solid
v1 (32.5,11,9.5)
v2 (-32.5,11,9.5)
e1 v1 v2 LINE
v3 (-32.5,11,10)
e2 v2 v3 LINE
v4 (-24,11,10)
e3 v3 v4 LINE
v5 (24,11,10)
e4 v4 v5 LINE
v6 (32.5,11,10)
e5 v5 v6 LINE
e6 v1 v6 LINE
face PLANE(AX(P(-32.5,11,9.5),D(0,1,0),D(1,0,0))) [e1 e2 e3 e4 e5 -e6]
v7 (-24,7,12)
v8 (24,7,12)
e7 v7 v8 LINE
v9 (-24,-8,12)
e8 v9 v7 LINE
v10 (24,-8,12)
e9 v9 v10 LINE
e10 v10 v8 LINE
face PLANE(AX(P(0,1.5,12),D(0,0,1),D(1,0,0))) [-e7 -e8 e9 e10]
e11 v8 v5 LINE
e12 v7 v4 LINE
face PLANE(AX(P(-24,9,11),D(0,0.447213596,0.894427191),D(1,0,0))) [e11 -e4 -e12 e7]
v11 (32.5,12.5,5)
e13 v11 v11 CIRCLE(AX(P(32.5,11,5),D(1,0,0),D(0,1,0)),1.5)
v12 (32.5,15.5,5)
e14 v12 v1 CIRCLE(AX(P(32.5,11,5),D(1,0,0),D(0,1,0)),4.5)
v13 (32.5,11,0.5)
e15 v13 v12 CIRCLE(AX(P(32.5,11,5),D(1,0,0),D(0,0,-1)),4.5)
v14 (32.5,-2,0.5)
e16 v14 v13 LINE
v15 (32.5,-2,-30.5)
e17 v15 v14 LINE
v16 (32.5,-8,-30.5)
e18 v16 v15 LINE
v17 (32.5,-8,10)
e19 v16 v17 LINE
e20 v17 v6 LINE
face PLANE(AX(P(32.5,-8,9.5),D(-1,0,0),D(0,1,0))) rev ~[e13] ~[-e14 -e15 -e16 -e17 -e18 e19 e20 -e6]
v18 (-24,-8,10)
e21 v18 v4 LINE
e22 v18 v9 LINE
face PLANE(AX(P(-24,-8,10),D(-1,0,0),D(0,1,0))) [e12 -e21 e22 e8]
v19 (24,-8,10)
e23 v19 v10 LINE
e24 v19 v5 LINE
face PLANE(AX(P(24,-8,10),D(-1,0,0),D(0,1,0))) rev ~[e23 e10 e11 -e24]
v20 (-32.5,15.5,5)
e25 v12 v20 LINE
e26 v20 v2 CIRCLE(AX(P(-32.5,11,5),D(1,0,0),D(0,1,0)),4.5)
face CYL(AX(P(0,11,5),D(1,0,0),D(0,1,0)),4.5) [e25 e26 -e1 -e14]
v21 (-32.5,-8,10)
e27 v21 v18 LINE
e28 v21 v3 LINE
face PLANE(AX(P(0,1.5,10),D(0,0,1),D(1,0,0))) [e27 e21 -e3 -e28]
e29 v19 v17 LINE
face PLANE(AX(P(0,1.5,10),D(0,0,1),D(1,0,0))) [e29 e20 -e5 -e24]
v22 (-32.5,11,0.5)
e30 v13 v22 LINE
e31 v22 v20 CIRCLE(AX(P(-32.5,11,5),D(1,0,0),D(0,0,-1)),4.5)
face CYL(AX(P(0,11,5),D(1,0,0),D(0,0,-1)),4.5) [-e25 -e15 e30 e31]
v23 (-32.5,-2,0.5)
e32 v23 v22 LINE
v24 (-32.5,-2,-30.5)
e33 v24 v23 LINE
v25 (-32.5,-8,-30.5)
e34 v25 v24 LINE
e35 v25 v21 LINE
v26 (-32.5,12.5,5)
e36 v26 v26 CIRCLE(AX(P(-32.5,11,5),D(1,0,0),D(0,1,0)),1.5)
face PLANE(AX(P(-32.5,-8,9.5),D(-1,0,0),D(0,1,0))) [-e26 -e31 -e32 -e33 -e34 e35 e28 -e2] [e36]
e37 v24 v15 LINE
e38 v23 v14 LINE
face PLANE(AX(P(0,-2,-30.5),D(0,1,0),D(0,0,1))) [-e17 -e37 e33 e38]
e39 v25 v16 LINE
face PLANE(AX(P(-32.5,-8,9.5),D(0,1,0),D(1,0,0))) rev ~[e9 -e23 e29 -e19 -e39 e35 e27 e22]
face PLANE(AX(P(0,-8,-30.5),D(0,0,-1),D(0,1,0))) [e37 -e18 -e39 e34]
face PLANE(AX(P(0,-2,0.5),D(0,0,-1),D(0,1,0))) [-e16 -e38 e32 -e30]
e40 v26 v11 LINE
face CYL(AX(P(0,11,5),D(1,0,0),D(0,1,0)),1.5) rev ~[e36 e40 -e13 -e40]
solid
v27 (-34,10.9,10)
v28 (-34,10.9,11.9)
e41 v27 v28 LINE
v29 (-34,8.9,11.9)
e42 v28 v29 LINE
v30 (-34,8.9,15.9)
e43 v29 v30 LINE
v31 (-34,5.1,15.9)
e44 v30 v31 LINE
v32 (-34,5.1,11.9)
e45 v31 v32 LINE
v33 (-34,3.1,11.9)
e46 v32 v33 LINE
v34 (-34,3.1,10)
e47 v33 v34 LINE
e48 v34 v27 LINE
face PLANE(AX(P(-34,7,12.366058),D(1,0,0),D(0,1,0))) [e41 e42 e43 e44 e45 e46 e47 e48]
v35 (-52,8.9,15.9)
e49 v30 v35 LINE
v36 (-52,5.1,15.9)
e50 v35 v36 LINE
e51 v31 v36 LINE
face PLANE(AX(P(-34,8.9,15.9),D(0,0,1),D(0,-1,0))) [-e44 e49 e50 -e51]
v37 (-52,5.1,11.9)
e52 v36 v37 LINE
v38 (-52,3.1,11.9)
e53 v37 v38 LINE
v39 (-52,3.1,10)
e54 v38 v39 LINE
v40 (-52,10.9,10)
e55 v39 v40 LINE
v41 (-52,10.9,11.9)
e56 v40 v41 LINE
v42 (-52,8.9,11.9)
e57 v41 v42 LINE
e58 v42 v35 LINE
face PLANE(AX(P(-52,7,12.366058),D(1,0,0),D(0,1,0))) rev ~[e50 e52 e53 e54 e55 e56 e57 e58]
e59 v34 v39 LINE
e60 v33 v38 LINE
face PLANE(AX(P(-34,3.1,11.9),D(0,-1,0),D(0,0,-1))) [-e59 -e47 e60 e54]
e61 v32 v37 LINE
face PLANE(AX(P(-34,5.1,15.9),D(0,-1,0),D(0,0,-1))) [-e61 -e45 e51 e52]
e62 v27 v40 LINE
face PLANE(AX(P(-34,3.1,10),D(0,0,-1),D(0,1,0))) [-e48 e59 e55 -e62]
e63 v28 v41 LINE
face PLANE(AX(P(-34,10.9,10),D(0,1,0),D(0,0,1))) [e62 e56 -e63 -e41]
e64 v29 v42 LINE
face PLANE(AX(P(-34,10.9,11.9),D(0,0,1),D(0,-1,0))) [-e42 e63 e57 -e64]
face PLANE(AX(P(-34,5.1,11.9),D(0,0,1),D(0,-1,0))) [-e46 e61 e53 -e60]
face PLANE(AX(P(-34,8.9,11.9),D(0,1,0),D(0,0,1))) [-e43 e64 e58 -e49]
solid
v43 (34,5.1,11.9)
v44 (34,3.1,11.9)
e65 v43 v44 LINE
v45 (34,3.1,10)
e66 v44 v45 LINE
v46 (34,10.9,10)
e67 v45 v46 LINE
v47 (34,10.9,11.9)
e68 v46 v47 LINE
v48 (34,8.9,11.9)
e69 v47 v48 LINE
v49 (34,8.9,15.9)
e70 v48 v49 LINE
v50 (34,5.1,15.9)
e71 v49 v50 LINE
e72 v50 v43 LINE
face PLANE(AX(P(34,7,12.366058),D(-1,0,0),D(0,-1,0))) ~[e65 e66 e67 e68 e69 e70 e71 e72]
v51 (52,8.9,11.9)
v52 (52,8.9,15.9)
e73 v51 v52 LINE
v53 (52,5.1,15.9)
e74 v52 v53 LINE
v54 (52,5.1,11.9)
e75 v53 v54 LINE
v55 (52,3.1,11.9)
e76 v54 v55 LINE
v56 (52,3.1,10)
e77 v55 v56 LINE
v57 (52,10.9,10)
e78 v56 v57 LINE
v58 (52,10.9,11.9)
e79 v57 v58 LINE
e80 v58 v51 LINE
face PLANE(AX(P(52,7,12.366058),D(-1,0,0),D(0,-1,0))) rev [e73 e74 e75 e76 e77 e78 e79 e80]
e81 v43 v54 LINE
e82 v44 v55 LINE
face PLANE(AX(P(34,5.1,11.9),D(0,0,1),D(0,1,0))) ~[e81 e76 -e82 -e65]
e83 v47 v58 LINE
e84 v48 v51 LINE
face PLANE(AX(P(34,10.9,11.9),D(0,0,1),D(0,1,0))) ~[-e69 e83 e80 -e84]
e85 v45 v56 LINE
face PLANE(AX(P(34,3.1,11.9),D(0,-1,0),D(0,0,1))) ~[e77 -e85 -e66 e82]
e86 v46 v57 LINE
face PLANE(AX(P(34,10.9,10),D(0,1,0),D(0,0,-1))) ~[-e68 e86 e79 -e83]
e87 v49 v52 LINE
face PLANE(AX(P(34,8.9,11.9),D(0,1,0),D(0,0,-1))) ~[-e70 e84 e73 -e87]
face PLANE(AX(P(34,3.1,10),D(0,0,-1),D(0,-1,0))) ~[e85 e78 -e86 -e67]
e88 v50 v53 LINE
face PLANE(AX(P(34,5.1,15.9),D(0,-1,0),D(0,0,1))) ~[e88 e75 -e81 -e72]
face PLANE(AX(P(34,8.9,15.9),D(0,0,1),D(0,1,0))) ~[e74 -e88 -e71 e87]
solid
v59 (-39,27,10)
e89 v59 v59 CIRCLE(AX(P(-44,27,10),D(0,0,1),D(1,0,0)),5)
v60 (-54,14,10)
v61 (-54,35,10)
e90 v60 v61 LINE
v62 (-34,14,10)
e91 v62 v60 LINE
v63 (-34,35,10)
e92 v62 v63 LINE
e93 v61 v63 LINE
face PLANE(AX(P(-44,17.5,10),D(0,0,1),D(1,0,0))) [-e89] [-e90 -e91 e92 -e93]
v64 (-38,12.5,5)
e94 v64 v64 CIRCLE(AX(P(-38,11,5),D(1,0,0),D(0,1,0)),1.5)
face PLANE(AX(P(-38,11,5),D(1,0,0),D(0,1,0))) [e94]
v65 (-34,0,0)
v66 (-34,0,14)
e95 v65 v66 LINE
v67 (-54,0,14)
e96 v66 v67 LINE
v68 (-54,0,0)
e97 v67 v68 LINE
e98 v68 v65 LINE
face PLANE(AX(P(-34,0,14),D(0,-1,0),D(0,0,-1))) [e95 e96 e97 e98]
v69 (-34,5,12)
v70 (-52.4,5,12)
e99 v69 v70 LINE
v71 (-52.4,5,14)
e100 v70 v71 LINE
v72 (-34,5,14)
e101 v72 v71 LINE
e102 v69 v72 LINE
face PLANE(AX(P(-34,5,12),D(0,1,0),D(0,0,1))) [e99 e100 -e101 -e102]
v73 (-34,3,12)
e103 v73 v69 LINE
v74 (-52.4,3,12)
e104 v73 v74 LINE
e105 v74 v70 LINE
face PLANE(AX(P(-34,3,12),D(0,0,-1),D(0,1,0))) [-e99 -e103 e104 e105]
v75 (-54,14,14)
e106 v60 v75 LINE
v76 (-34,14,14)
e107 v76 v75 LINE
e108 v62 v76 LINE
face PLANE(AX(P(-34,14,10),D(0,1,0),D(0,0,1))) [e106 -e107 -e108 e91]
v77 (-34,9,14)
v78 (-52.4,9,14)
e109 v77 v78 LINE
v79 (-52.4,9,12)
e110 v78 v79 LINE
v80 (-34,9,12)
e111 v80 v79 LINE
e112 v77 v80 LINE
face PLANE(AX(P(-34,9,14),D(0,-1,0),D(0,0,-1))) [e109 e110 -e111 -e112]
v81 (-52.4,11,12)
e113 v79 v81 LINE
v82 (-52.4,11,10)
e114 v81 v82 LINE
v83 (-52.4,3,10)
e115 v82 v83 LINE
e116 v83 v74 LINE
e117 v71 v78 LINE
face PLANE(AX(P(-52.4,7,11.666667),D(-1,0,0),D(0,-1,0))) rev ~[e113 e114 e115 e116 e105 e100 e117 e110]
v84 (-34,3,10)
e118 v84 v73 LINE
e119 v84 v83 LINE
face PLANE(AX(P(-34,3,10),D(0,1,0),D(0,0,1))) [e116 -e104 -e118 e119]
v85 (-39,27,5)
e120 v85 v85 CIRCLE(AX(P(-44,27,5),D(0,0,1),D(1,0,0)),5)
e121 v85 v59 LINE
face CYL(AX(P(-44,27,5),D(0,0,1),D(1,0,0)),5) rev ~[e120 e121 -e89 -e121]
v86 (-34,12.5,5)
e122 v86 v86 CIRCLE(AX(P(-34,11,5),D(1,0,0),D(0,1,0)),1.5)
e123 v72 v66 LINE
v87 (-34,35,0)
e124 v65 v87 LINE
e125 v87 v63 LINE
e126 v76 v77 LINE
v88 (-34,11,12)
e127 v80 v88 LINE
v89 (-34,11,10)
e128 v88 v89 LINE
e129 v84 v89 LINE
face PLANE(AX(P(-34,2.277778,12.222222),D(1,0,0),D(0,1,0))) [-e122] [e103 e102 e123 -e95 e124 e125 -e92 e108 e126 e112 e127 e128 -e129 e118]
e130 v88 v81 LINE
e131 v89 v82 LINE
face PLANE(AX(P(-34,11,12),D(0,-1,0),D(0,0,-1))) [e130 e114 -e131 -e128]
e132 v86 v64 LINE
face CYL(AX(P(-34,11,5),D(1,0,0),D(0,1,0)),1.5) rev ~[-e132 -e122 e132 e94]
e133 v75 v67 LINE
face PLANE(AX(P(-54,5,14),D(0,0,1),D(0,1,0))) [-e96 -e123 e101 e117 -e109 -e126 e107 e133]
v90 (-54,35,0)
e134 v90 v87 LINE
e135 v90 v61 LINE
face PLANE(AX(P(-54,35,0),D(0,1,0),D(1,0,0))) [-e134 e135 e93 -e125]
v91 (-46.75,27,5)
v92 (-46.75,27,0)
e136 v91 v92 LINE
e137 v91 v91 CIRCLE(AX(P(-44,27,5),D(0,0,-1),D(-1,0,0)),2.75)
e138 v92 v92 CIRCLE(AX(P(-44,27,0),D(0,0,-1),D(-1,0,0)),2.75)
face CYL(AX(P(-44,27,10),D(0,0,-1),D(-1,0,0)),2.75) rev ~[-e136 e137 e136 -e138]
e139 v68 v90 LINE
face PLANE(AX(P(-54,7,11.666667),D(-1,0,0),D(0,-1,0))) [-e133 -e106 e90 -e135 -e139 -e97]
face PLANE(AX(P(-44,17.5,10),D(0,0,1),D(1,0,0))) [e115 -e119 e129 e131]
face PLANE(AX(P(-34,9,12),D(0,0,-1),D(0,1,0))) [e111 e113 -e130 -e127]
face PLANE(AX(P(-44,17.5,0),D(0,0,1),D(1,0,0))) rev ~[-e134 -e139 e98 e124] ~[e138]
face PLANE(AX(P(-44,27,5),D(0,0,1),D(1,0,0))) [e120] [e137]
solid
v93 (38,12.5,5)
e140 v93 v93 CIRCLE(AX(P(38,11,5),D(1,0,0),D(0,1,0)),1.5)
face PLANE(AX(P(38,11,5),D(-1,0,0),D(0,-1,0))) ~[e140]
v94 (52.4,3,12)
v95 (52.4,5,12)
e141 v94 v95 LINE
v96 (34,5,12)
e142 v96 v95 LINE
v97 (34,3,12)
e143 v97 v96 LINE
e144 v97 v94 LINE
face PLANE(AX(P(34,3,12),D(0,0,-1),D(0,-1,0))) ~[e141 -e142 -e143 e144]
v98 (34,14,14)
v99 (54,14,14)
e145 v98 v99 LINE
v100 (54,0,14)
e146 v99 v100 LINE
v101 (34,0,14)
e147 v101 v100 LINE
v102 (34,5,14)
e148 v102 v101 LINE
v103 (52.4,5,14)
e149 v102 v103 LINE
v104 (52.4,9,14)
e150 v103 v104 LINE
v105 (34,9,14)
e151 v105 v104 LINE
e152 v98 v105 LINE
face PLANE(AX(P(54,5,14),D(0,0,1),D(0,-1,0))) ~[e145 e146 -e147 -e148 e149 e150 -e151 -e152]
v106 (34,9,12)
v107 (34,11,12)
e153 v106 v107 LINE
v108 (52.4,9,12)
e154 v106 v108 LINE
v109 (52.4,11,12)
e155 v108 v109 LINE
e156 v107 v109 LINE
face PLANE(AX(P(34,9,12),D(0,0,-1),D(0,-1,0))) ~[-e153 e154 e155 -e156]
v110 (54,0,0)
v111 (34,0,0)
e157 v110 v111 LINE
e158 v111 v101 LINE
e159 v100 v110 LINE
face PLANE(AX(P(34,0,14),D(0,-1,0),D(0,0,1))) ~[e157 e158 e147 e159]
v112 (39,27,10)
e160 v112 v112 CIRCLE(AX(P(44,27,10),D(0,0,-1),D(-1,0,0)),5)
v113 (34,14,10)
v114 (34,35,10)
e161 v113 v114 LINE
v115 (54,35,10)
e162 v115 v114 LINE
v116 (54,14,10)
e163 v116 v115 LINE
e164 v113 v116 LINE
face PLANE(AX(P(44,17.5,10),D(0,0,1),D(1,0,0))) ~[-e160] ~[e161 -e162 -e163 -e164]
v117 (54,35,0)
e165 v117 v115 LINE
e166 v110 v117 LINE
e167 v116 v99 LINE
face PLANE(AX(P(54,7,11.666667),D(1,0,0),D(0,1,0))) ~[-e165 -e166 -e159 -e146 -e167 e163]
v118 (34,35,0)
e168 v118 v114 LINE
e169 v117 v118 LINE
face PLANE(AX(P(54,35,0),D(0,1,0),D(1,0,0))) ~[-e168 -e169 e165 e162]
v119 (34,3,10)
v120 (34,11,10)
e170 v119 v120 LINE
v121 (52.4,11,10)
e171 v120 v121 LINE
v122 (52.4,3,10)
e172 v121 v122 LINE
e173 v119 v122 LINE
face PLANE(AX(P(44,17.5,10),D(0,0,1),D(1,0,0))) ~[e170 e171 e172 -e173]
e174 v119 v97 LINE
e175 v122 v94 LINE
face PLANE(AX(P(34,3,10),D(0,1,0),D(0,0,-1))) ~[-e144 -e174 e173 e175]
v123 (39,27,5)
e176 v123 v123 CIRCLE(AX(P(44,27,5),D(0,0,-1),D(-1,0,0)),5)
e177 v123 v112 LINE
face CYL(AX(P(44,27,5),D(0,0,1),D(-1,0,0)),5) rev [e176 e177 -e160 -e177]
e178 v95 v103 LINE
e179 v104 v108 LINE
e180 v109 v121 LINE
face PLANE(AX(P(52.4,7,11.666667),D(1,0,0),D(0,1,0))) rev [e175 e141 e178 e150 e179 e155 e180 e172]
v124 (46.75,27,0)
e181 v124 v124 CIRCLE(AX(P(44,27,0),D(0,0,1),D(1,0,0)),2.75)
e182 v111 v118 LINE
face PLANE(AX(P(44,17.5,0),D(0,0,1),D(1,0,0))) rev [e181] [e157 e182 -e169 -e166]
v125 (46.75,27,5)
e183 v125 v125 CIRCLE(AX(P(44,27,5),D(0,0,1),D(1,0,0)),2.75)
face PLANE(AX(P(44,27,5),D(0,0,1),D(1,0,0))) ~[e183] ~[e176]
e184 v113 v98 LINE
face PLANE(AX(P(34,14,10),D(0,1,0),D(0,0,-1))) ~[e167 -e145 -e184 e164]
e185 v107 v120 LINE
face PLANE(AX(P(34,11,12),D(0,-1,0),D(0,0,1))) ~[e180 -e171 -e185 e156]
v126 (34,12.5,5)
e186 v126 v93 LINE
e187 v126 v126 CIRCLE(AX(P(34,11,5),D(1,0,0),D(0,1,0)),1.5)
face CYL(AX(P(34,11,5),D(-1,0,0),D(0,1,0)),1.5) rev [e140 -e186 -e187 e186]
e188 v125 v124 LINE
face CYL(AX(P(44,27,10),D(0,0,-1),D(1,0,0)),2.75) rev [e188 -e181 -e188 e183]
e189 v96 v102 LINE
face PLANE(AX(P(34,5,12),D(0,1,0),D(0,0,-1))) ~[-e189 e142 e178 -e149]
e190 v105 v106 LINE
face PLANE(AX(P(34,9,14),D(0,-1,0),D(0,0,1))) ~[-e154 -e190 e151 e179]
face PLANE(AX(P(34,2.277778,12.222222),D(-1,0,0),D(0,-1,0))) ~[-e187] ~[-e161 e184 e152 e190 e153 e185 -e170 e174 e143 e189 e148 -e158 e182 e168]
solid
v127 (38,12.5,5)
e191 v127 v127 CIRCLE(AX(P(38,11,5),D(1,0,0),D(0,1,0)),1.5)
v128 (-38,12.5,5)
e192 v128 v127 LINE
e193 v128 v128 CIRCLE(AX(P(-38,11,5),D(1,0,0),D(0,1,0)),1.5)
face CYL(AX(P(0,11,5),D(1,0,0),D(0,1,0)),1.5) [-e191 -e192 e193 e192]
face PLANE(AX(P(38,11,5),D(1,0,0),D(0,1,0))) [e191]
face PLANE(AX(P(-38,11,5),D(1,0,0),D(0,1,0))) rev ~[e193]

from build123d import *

# Parameters (mm, degrees)
F0_W           = 20
F0_H           = 35
F1_DEPTH       = 10
F3_D           = 5.5
F3_CBORE_D     = 10
F3_CBORE_DEPTH = 5
F5_DEPTH       = 20
F6_DEPTH       = 18
F8_DEPTH       = 1.6
F4_R           = 1.5
F9_DEPTH       = 4
F11_R          = 1.5
F12_DEPTH      = 38
F12_DEPTH_BACK = 38
F14_DEPTH      = 32.5
F16_W          = 65
F16_H          = 19
F17_DEPTH      = 0.5
F18_W          = 48
F18_H          = 19
F19_DEPTH      = 2
F20_SIZE2      = 2
F20_SIZE       = 4


# Not quite as in the source:
# - a feature names something its author has since deleted; it is built from what else it names


with BuildPart() as f1:
    # F0 (on Top) → F1 (new body)
    with BuildSketch(Plane.XY):
        with Locations((-44, 17.5)):
            Rectangle(F0_W, F0_H)
    extrude(amount=F1_DEPTH)

    # F3 (through all)
    with Locations(Plane.XY.offset(10)):
        with Locations((-44, 27)):
            CounterBoreHole(F3_D / 2, F3_CBORE_D / 2, F3_CBORE_DEPTH)

    # F4 (on face) → F5 (join, through all)
    with BuildSketch(Plane.YZ.offset(-34)):
        Polygon((0, 14), (0, 10), (3, 10), (3, 12), (5, 12), (5, 14), align=None)
        Polygon((11, 10), (14, 10), (14, 14), (9, 14), (9, 12), (11, 12), align=None)
    extrude(amount=-F5_DEPTH)

    # F7 (on face) → F8 (join)
    with BuildSketch(Plane(origin=(-54, 0, 0), x_dir=(0, -1, 0), z_dir=(-1, 0, 0))):
        Polygon((-5, 14), (-9, 14), (-9, 12), (-11, 12), (-11, 10), (-3, 10), (-3, 12), (-5, 12), align=None)
    extrude(amount=-F8_DEPTH)

    # F4 (on face) → F9 (cut)
    with BuildSketch(Plane.YZ.offset(-34)):
        with Locations((11, 5)):
            Circle(F4_R)
    extrude(amount=-F9_DEPTH, mode=Mode.SUBTRACT)


with BuildPart() as f6:
    # F4 (on face) → F6 (new body)
    with BuildSketch(Plane.YZ.offset(-34)):
        Polygon((3.1, 11.9), (3.1, 10), (7, 10), (10.9, 10), (10.9, 11.9), (8.9, 11.9), (8.9, 15.9), (7, 15.9), (5.1, 15.9), (5.1, 11.9), align=None)
    extrude(amount=-F6_DEPTH)


with BuildPart() as f10_1:
    # F10: instance of F1
    add(f1.part.mirror(Plane.YZ))


with BuildPart() as f10_2:
    # F10: instance of F6
    add(f6.part.mirror(Plane.YZ))


with BuildPart() as f12:
    # F11 (on Right) → F12 (new body, two sides)
    with BuildSketch(Plane.YZ) as f12_sk:
        with Locations((11, 5)):
            Circle(F11_R)
    extrude(amount=F12_DEPTH)
    extrude(f12_sk.sketch, amount=-F12_DEPTH_BACK)


with BuildPart() as f14:
    # F13 (on Right) → F14 (new body, symmetric)
    with BuildSketch(Plane.YZ):
        with BuildLine():
            Line((0, 0.5), (11, 0.5))
            ThreePointArc((11, 0.5), (6.5, 5), (11, 9.5))
            Line((11, 9.5), (-8, 9.5))
            Line((-8, 9.5), (-8, -30.5))
            Line((-8, -30.5), (-2, -30.5))
            Line((-2, -30.5), (-2, 0.5))
            Line((-2, 0.5), (0, 0.5))
        make_face()
        with BuildLine():
            ThreePointArc((11, 9.5), (6.5, 5), (11, 0.5))
            ThreePointArc((11, 0.5), (14.1819805153, 1.8180194847), (15.5, 5))
            ThreePointArc((15.5, 5), (14.1819805153, 8.1819805153), (11, 9.5))
        make_face()
    extrude(amount=F14_DEPTH, both=True)

    # F15: cut F12
    add(f12.part, mode=Mode.SUBTRACT)

    # F16 (on face) → F17 (join, through all)
    with BuildSketch(Plane.XY.offset(9.5)):
        with Locations((0, 1.5)):
            Rectangle(F16_W, F16_H)
    extrude(amount=F17_DEPTH)

    # F18 (on face) → F19 (join)
    with BuildSketch(Plane.XY.offset(10)):
        with Locations((0, 1.5)):
            Rectangle(F18_W, F18_H)
    extrude(amount=F19_DEPTH)

    # F20
    f20_edges = [f14.edges().sort_by_distance(p)[0] for p in [
        (0, 11, 12),
    ]]
    f20_side = f14.faces().sort_by_distance((0, 1.5, 12))[0]
    chamfer(f20_edges, length=F20_SIZE, length2=F20_SIZE2, reference=f20_side)


solid = Compound([f1.part, f6.part, f10_1.part, f10_2.part, f12.part, f14.part])
